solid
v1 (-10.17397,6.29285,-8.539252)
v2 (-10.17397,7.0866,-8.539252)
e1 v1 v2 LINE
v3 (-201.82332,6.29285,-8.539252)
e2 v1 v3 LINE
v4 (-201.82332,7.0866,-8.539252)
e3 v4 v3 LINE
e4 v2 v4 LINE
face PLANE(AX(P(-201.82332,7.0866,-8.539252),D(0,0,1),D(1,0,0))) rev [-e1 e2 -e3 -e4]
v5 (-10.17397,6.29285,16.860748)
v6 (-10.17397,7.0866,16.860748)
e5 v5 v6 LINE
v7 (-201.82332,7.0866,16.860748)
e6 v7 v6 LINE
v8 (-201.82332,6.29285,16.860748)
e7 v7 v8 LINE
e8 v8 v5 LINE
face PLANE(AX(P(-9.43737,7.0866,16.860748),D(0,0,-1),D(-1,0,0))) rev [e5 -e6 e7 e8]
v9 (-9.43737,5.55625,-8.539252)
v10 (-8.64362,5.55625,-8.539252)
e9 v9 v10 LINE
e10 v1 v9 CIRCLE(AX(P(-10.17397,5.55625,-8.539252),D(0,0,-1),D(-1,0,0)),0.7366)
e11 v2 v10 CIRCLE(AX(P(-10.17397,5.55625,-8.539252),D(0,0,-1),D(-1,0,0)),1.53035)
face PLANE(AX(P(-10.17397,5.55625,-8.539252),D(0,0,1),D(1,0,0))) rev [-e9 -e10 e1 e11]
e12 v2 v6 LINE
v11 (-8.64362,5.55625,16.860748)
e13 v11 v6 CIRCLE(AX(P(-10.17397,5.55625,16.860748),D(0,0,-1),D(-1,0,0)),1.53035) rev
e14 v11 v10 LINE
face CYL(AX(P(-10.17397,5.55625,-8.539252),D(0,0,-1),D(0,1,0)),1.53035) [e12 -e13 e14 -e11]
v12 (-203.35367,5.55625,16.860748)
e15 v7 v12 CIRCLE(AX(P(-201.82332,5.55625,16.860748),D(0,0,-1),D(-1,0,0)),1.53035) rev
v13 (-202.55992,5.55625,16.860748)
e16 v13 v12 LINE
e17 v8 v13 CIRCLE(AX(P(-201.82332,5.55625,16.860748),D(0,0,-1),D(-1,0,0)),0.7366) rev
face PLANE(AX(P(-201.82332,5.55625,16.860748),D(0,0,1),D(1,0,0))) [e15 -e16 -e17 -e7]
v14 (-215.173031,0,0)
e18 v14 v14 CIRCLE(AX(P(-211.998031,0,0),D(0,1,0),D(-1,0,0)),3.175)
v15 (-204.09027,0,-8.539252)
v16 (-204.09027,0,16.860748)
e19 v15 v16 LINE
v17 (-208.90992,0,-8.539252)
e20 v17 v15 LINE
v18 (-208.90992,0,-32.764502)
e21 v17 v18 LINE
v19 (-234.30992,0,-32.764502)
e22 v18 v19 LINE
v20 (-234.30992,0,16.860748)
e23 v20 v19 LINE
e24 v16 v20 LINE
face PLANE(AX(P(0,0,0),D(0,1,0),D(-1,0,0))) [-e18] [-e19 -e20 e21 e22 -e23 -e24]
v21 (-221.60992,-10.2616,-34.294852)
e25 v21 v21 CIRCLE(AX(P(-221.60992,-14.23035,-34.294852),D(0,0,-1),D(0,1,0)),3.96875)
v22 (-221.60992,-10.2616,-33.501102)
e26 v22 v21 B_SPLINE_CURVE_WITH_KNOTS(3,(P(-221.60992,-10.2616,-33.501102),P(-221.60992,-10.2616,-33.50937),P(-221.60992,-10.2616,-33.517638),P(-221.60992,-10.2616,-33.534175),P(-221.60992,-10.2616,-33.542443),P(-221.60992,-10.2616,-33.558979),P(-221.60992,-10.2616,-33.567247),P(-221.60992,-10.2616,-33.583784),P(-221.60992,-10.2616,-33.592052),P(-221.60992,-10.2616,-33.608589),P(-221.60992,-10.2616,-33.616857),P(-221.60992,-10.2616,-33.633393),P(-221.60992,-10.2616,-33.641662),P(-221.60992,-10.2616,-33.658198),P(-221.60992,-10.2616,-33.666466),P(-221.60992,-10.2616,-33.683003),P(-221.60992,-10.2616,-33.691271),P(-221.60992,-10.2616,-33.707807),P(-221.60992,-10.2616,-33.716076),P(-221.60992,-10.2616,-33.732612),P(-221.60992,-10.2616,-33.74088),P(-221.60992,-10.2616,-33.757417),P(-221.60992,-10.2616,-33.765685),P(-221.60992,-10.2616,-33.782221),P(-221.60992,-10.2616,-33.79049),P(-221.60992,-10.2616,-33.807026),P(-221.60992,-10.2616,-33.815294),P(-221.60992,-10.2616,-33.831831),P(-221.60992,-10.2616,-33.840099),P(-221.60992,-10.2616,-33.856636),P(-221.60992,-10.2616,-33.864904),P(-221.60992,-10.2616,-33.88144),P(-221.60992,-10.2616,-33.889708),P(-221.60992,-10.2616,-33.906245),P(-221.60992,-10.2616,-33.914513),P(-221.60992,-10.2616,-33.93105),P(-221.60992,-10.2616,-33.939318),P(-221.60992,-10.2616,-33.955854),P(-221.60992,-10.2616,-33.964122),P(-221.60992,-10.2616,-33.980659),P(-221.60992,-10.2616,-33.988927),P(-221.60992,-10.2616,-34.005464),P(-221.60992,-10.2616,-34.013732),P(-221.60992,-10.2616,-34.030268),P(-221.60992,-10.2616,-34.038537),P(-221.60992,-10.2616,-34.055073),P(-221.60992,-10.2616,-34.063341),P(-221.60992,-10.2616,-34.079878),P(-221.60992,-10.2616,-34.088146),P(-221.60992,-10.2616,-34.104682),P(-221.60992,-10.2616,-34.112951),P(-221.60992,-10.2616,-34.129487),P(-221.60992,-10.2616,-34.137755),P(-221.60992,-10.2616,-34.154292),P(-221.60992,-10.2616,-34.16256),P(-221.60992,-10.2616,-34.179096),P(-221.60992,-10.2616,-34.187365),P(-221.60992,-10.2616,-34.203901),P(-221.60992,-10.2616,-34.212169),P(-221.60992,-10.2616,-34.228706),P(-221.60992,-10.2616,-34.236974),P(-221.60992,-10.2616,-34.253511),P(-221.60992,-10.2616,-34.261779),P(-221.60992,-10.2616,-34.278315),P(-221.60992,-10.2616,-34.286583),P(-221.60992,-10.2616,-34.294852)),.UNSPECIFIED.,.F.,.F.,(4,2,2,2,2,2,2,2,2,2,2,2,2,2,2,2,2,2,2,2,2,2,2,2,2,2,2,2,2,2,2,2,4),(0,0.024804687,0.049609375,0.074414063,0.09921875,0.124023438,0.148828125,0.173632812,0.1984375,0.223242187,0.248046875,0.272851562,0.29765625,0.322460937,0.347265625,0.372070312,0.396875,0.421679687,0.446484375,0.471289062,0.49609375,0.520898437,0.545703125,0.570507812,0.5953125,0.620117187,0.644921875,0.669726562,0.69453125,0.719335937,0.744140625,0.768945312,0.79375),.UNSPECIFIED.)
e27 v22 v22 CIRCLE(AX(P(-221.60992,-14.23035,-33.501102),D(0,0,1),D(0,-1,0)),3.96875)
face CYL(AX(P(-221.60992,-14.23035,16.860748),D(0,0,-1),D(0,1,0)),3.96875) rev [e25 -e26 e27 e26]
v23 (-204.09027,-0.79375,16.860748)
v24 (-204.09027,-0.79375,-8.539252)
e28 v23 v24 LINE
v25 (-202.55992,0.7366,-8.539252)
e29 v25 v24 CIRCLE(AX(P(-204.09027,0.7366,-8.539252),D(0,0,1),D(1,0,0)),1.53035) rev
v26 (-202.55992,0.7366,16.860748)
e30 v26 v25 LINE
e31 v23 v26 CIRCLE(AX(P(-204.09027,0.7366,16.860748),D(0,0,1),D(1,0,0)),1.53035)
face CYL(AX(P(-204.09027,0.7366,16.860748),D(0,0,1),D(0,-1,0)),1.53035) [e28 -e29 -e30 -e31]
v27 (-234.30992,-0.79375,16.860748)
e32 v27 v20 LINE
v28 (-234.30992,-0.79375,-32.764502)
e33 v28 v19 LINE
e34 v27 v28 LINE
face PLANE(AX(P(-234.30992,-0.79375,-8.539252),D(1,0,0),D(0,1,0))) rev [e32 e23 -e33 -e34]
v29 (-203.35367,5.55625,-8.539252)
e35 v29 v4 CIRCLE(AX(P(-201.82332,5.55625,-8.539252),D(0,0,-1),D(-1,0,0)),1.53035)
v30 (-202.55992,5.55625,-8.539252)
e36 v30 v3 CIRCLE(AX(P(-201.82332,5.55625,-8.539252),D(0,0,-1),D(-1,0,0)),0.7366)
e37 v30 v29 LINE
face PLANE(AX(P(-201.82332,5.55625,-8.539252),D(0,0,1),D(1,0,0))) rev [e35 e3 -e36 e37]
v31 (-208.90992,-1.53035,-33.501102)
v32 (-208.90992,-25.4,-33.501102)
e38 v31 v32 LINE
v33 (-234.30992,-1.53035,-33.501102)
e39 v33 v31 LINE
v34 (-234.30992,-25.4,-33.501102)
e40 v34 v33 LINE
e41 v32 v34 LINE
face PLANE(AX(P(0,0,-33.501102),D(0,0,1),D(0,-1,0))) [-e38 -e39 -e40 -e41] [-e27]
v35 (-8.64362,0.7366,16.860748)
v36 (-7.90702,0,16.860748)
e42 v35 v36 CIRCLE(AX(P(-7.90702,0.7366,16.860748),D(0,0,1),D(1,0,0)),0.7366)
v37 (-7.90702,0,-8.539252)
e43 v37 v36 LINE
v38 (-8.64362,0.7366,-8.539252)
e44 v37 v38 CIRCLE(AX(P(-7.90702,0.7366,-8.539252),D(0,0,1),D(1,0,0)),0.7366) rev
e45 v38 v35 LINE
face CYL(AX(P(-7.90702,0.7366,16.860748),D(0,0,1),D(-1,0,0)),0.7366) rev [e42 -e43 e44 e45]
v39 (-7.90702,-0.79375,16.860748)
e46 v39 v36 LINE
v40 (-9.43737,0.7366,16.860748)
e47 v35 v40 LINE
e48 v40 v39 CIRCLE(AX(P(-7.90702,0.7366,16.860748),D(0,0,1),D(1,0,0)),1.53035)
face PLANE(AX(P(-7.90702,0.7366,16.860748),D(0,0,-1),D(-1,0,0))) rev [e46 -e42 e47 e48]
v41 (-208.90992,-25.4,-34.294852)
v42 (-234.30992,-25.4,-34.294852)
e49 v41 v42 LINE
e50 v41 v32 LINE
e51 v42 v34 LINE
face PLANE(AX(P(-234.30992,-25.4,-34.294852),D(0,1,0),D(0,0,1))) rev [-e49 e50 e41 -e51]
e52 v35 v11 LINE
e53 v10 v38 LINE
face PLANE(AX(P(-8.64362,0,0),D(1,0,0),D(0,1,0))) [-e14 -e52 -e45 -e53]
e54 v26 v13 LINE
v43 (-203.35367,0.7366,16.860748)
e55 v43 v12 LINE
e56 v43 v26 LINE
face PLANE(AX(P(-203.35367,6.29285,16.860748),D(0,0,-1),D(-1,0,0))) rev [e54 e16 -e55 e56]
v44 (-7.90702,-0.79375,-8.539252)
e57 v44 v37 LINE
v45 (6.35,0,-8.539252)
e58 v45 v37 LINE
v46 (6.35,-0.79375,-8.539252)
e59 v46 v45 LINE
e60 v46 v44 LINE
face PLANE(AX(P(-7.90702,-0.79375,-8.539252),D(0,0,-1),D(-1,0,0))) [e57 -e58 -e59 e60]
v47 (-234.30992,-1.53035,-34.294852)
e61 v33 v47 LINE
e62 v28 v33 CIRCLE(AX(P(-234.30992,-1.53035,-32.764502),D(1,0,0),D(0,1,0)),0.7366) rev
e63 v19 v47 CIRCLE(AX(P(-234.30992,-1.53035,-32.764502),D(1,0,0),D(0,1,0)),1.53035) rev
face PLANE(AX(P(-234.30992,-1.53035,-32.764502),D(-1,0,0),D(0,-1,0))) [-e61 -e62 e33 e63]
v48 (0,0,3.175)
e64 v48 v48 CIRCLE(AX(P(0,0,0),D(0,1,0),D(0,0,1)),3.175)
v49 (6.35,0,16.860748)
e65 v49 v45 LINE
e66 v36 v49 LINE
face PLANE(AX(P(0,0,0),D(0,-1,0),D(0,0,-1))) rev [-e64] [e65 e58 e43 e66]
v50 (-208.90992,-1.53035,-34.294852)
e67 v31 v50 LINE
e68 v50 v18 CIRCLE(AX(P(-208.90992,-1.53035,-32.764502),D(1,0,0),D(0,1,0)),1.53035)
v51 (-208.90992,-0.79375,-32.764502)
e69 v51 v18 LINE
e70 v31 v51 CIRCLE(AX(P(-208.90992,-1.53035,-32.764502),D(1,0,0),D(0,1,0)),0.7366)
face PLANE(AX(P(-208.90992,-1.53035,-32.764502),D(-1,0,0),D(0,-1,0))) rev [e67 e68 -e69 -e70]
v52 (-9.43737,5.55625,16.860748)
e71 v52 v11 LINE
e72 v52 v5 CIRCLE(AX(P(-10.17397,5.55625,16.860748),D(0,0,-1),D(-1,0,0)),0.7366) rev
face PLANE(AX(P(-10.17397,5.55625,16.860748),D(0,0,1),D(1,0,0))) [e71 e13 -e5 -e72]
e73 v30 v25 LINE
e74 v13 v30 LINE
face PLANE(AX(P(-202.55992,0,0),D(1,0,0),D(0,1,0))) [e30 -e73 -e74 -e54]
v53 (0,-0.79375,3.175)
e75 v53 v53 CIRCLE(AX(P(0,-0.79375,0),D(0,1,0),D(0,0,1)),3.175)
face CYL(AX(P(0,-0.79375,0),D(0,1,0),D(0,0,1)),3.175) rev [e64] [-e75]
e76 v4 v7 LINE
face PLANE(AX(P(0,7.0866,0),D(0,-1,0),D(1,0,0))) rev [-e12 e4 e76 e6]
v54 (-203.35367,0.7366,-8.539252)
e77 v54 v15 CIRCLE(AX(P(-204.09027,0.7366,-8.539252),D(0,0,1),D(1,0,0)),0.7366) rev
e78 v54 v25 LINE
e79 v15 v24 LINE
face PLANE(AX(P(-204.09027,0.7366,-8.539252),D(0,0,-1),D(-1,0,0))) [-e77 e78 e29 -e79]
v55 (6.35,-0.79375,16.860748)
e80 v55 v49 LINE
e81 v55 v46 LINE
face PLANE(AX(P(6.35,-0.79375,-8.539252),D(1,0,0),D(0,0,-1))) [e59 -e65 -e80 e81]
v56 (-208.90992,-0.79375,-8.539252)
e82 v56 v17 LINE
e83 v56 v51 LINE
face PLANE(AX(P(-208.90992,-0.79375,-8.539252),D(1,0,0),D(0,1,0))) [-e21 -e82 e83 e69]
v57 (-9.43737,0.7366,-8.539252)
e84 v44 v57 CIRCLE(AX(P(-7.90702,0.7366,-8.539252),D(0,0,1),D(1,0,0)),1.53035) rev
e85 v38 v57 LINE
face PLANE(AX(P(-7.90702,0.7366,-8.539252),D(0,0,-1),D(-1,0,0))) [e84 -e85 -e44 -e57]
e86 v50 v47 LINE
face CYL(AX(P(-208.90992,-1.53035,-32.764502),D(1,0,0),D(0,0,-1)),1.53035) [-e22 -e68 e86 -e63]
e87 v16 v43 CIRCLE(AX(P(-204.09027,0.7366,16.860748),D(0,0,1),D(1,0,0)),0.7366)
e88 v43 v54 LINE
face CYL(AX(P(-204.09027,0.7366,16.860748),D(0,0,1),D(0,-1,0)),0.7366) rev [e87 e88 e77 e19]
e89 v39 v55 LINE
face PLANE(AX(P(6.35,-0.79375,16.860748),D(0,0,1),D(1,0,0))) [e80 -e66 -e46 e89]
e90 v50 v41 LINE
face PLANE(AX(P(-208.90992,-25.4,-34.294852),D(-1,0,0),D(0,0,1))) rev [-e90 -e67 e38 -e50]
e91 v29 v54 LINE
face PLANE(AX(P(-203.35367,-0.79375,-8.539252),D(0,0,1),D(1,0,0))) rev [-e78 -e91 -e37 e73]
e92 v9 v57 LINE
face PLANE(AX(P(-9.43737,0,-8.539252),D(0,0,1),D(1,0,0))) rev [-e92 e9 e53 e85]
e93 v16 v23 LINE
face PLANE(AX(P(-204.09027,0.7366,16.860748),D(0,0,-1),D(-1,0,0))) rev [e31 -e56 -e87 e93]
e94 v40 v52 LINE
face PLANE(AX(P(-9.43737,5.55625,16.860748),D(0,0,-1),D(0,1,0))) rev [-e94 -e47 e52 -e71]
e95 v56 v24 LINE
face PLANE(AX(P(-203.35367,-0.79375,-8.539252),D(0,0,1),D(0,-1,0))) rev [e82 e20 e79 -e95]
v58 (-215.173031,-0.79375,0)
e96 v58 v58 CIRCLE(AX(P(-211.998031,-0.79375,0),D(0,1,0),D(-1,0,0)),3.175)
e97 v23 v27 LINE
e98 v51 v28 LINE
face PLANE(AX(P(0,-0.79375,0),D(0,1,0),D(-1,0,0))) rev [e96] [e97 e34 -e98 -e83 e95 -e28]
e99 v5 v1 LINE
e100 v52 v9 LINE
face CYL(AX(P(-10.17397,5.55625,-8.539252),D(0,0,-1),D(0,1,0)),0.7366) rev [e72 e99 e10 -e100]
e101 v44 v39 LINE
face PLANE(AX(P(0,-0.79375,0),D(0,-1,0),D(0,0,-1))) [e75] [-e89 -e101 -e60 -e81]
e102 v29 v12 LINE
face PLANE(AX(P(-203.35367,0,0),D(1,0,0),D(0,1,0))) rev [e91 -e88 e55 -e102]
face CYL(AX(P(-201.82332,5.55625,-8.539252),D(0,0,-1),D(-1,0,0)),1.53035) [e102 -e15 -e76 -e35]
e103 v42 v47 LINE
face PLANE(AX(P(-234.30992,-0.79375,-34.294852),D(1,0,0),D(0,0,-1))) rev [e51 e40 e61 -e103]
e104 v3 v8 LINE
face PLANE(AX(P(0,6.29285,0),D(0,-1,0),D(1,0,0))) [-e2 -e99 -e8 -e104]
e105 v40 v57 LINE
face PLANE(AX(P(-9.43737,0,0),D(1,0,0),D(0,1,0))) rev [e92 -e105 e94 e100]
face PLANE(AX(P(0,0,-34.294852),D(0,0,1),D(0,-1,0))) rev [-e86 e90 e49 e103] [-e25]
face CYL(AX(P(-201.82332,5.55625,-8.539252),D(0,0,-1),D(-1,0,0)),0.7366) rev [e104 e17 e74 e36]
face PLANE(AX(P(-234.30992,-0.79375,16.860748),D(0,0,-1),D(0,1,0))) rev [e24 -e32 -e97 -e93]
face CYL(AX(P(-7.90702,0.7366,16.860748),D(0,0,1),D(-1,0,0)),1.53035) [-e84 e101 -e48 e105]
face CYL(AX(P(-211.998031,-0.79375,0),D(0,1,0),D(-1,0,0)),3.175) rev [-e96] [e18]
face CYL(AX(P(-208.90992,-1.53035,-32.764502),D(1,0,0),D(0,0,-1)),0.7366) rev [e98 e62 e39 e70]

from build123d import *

# Parameters (mm, degrees)
SKETCH1_W                    = 14.25702
SKETCH1_H                    = 25.4
SKETCH1_R                    = 3.175
BASE_FLANGE1_DEPTH           = 0.79375
EDGE_FLANGE1_DEPTH           = 25.4
EDGE_FLANGE2_DEPTH           = 25.4
EDGE_FLANGE3_DEPTH           = 25.4
EDGE_FLANGE4_STRIP_W         = 4.6482
EDGE_FLANGE4_STRIP_H         = 0.79375
EDGE_FLANGE4_STRIP_CUT_DEPTH = 25.4
EDGE_FLANGE4_DEPTH           = 25.4
SKETCH16_R                   = 3.175
CUT_EXTRUDE1_DEPTH           = 236.022644323
SKETCH17_W                   = 25.4
SKETCH17_H                   = 25.7556
TAB1_DEPTH                   = 0.79375
EDGE_FLANGE5_STRIP_W         = 4.6482
EDGE_FLANGE5_STRIP_H         = 0.79375
EDGE_FLANGE5_STRIP_CUT_DEPTH = 25.4
EDGE_FLANGE5_DEPTH           = 25.4
SKETCH25_R                   = 3.96875
CUT_EXTRUDE2_DEPTH           = 242.170466728


# Sheet-metal steps are written as plain solids
with BuildPart() as part:
    # Sketch1 → Base-Flange1 (new body)
    with BuildSketch(Plane(origin=(0, 0, 0), x_dir=(1, 0, 0), z_dir=(0, 1, 0))):
        with Locations((-0.77851, -4.160748346)):
            Rectangle(SKETCH1_W, SKETCH1_H)
        with Locations(Location((0, 0, 0), (0, 0, 270))):
            Circle(SKETCH1_R, mode=Mode.SUBTRACT)
    extrude(amount=-BASE_FLANGE1_DEPTH)

    # Edge-Flange1 section (across the edge) → Edge-Flange1 (add)
    with BuildSketch(Plane(origin=(-8.64362, 0, -8.539251654), x_dir=(1, 0, 0), z_dir=(0, 0, 1))):
        with BuildLine():
            Line((-0.79375, 0.7366), (-0.79375, 5.55625))
            Line((-0.79375, 5.55625), (0, 5.55625))
            Line((0, 5.55625), (0, 0.7366))
            ThreePointArc((0, 0.7366), (0.215745145, 0.215745145), (0.7366, 0))
            Line((0.7366, 0), (0.7366, -0.79375))
            ThreePointArc((0.7366, -0.79375), (-0.345520863, -0.345520863), (-0.79375, 0.7366))
        make_face()
    extrude(amount=EDGE_FLANGE1_DEPTH)

    # Edge-Flange2 section (across the edge) → Edge-Flange2 (add)
    with BuildSketch(Plane(origin=(-9.43737, 6.29285, 16.860748346), x_dir=(0, -1, 0), z_dir=(0, 0, -1))):
        with BuildLine():
            Line((-0.79375, 0.7366), (-0.79375, 192.38595))
            Line((-0.79375, 192.38595), (0, 192.38595))
            Line((0, 192.38595), (0, 0.7366))
            ThreePointArc((0, 0.7366), (0.215745145, 0.215745145), (0.7366, 0))
            Line((0.7366, 0), (0.7366, -0.79375))
            ThreePointArc((0.7366, -0.79375), (-0.345520863, -0.345520863), (-0.79375, 0.7366))
        make_face()
    extrude(amount=EDGE_FLANGE2_DEPTH)

    # Edge-Flange3 section (across the edge) → Edge-Flange3 (add)
    with BuildSketch(Plane(origin=(-202.55992, 6.29285, 16.860748346), x_dir=(1, 0, 0), z_dir=(0, 0, -1))):
        with BuildLine():
            Line((-0.79375, 0.7366), (-0.79375, 7.0866))
            Line((-0.79375, 7.0866), (0, 7.0866))
            Line((0, 7.0866), (0, 0.7366))
            ThreePointArc((0, 0.7366), (0.215745145, 0.215745145), (0.7366, 0))
            Line((0.7366, 0), (0.7366, -0.79375))
            ThreePointArc((0.7366, -0.79375), (-0.345520863, -0.345520863), (-0.79375, 0.7366))
        make_face()
    extrude(amount=EDGE_FLANGE3_DEPTH)

    # Edge-Flange4 strip (across the edge) → Edge-Flange4 strip cut (cut)
    with BuildSketch(Plane(origin=(-203.35367, -0.79375, -8.539251654), x_dir=(0, 1, 0), z_dir=(0, 0, 1))):
        with Locations((-0.79375, -0.396875)):
            Rectangle(EDGE_FLANGE4_STRIP_W, EDGE_FLANGE4_STRIP_H)
    extrude(amount=EDGE_FLANGE4_STRIP_CUT_DEPTH, mode=Mode.SUBTRACT)

    # Edge-Flange4 section (across the edge) → Edge-Flange4 (add)
    with BuildSketch(Plane(origin=(-203.35367, -0.79375, -8.539251654), x_dir=(0, 1, 0), z_dir=(0, 0, 1))):
        with BuildLine():
            Line((0, 0.7366), (0, 30.95625))
            Line((0, 30.95625), (0.79375, 30.95625))
            Line((0.79375, 30.95625), (0.79375, 0.7366))
            ThreePointArc((0.79375, 0.7366), (1.009495145, 0.215745145), (1.53035, 0))
            Line((1.53035, 0), (1.53035, -0.79375))
            ThreePointArc((1.53035, -0.79375), (0.448229137, -0.345520863), (0, 0.7366))
        make_face()
    extrude(amount=EDGE_FLANGE4_DEPTH)

    # Sketch16 → Cut-Extrude1 (cut, through all)
    with BuildSketch(Plane(origin=(0, 0, 0), x_dir=(1, 0, 0), z_dir=(0, 1, 0))):
        with Locations(Location((-211.998031426, 0, 0), (0, 0, 180))):
            Circle(SKETCH16_R)
    extrude(amount=-CUT_EXTRUDE1_DEPTH, mode=Mode.SUBTRACT)

    # Sketch17 → Tab1 (add)
    with BuildSketch(Plane(origin=(0, 0, 0), x_dir=(1, 0, 0), z_dir=(0, 1, 0))):
        with Locations((-221.60992, 21.417051654)):
            Rectangle(SKETCH17_W, SKETCH17_H)
    extrude(amount=-TAB1_DEPTH)

    # Edge-Flange5 strip (across the edge) → Edge-Flange5 strip cut (cut)
    with BuildSketch(Plane(origin=(-234.30992, -0.79375, -34.294851654), x_dir=(0, 0, 1), z_dir=(1, 0, 0))):
        with Locations((-0.79375, -0.396875)):
            Rectangle(EDGE_FLANGE5_STRIP_W, EDGE_FLANGE5_STRIP_H)
    extrude(amount=EDGE_FLANGE5_STRIP_CUT_DEPTH, mode=Mode.SUBTRACT)

    # Edge-Flange5 section (across the edge) → Edge-Flange5 (add)
    with BuildSketch(Plane(origin=(-234.30992, -0.79375, -34.294851654), x_dir=(0, 0, 1), z_dir=(1, 0, 0))):
        with BuildLine():
            Line((0, 0.7366), (0, 24.60625))
            Line((0, 24.60625), (0.79375, 24.60625))
            Line((0.79375, 24.60625), (0.79375, 0.7366))
            ThreePointArc((0.79375, 0.7366), (1.009495145, 0.215745145), (1.53035, 0))
            Line((1.53035, 0), (1.53035, -0.79375))
            ThreePointArc((1.53035, -0.79375), (0.448229137, -0.345520863), (0, 0.7366))
        make_face()
    extrude(amount=EDGE_FLANGE5_DEPTH)

    # Sketch25 → Cut-Extrude2 (cut, through all)
    with BuildSketch(Plane(origin=(0, 0, -34.294851654), x_dir=(-1, 0, 0), z_dir=(0, 0, -1))):
        with Locations(Location((221.60992, -14.23035, 0), (0, 0, 90))):
            Circle(SKETCH25_R)
    extrude(amount=-CUT_EXTRUDE2_DEPTH, mode=Mode.SUBTRACT)


solid = part.part
